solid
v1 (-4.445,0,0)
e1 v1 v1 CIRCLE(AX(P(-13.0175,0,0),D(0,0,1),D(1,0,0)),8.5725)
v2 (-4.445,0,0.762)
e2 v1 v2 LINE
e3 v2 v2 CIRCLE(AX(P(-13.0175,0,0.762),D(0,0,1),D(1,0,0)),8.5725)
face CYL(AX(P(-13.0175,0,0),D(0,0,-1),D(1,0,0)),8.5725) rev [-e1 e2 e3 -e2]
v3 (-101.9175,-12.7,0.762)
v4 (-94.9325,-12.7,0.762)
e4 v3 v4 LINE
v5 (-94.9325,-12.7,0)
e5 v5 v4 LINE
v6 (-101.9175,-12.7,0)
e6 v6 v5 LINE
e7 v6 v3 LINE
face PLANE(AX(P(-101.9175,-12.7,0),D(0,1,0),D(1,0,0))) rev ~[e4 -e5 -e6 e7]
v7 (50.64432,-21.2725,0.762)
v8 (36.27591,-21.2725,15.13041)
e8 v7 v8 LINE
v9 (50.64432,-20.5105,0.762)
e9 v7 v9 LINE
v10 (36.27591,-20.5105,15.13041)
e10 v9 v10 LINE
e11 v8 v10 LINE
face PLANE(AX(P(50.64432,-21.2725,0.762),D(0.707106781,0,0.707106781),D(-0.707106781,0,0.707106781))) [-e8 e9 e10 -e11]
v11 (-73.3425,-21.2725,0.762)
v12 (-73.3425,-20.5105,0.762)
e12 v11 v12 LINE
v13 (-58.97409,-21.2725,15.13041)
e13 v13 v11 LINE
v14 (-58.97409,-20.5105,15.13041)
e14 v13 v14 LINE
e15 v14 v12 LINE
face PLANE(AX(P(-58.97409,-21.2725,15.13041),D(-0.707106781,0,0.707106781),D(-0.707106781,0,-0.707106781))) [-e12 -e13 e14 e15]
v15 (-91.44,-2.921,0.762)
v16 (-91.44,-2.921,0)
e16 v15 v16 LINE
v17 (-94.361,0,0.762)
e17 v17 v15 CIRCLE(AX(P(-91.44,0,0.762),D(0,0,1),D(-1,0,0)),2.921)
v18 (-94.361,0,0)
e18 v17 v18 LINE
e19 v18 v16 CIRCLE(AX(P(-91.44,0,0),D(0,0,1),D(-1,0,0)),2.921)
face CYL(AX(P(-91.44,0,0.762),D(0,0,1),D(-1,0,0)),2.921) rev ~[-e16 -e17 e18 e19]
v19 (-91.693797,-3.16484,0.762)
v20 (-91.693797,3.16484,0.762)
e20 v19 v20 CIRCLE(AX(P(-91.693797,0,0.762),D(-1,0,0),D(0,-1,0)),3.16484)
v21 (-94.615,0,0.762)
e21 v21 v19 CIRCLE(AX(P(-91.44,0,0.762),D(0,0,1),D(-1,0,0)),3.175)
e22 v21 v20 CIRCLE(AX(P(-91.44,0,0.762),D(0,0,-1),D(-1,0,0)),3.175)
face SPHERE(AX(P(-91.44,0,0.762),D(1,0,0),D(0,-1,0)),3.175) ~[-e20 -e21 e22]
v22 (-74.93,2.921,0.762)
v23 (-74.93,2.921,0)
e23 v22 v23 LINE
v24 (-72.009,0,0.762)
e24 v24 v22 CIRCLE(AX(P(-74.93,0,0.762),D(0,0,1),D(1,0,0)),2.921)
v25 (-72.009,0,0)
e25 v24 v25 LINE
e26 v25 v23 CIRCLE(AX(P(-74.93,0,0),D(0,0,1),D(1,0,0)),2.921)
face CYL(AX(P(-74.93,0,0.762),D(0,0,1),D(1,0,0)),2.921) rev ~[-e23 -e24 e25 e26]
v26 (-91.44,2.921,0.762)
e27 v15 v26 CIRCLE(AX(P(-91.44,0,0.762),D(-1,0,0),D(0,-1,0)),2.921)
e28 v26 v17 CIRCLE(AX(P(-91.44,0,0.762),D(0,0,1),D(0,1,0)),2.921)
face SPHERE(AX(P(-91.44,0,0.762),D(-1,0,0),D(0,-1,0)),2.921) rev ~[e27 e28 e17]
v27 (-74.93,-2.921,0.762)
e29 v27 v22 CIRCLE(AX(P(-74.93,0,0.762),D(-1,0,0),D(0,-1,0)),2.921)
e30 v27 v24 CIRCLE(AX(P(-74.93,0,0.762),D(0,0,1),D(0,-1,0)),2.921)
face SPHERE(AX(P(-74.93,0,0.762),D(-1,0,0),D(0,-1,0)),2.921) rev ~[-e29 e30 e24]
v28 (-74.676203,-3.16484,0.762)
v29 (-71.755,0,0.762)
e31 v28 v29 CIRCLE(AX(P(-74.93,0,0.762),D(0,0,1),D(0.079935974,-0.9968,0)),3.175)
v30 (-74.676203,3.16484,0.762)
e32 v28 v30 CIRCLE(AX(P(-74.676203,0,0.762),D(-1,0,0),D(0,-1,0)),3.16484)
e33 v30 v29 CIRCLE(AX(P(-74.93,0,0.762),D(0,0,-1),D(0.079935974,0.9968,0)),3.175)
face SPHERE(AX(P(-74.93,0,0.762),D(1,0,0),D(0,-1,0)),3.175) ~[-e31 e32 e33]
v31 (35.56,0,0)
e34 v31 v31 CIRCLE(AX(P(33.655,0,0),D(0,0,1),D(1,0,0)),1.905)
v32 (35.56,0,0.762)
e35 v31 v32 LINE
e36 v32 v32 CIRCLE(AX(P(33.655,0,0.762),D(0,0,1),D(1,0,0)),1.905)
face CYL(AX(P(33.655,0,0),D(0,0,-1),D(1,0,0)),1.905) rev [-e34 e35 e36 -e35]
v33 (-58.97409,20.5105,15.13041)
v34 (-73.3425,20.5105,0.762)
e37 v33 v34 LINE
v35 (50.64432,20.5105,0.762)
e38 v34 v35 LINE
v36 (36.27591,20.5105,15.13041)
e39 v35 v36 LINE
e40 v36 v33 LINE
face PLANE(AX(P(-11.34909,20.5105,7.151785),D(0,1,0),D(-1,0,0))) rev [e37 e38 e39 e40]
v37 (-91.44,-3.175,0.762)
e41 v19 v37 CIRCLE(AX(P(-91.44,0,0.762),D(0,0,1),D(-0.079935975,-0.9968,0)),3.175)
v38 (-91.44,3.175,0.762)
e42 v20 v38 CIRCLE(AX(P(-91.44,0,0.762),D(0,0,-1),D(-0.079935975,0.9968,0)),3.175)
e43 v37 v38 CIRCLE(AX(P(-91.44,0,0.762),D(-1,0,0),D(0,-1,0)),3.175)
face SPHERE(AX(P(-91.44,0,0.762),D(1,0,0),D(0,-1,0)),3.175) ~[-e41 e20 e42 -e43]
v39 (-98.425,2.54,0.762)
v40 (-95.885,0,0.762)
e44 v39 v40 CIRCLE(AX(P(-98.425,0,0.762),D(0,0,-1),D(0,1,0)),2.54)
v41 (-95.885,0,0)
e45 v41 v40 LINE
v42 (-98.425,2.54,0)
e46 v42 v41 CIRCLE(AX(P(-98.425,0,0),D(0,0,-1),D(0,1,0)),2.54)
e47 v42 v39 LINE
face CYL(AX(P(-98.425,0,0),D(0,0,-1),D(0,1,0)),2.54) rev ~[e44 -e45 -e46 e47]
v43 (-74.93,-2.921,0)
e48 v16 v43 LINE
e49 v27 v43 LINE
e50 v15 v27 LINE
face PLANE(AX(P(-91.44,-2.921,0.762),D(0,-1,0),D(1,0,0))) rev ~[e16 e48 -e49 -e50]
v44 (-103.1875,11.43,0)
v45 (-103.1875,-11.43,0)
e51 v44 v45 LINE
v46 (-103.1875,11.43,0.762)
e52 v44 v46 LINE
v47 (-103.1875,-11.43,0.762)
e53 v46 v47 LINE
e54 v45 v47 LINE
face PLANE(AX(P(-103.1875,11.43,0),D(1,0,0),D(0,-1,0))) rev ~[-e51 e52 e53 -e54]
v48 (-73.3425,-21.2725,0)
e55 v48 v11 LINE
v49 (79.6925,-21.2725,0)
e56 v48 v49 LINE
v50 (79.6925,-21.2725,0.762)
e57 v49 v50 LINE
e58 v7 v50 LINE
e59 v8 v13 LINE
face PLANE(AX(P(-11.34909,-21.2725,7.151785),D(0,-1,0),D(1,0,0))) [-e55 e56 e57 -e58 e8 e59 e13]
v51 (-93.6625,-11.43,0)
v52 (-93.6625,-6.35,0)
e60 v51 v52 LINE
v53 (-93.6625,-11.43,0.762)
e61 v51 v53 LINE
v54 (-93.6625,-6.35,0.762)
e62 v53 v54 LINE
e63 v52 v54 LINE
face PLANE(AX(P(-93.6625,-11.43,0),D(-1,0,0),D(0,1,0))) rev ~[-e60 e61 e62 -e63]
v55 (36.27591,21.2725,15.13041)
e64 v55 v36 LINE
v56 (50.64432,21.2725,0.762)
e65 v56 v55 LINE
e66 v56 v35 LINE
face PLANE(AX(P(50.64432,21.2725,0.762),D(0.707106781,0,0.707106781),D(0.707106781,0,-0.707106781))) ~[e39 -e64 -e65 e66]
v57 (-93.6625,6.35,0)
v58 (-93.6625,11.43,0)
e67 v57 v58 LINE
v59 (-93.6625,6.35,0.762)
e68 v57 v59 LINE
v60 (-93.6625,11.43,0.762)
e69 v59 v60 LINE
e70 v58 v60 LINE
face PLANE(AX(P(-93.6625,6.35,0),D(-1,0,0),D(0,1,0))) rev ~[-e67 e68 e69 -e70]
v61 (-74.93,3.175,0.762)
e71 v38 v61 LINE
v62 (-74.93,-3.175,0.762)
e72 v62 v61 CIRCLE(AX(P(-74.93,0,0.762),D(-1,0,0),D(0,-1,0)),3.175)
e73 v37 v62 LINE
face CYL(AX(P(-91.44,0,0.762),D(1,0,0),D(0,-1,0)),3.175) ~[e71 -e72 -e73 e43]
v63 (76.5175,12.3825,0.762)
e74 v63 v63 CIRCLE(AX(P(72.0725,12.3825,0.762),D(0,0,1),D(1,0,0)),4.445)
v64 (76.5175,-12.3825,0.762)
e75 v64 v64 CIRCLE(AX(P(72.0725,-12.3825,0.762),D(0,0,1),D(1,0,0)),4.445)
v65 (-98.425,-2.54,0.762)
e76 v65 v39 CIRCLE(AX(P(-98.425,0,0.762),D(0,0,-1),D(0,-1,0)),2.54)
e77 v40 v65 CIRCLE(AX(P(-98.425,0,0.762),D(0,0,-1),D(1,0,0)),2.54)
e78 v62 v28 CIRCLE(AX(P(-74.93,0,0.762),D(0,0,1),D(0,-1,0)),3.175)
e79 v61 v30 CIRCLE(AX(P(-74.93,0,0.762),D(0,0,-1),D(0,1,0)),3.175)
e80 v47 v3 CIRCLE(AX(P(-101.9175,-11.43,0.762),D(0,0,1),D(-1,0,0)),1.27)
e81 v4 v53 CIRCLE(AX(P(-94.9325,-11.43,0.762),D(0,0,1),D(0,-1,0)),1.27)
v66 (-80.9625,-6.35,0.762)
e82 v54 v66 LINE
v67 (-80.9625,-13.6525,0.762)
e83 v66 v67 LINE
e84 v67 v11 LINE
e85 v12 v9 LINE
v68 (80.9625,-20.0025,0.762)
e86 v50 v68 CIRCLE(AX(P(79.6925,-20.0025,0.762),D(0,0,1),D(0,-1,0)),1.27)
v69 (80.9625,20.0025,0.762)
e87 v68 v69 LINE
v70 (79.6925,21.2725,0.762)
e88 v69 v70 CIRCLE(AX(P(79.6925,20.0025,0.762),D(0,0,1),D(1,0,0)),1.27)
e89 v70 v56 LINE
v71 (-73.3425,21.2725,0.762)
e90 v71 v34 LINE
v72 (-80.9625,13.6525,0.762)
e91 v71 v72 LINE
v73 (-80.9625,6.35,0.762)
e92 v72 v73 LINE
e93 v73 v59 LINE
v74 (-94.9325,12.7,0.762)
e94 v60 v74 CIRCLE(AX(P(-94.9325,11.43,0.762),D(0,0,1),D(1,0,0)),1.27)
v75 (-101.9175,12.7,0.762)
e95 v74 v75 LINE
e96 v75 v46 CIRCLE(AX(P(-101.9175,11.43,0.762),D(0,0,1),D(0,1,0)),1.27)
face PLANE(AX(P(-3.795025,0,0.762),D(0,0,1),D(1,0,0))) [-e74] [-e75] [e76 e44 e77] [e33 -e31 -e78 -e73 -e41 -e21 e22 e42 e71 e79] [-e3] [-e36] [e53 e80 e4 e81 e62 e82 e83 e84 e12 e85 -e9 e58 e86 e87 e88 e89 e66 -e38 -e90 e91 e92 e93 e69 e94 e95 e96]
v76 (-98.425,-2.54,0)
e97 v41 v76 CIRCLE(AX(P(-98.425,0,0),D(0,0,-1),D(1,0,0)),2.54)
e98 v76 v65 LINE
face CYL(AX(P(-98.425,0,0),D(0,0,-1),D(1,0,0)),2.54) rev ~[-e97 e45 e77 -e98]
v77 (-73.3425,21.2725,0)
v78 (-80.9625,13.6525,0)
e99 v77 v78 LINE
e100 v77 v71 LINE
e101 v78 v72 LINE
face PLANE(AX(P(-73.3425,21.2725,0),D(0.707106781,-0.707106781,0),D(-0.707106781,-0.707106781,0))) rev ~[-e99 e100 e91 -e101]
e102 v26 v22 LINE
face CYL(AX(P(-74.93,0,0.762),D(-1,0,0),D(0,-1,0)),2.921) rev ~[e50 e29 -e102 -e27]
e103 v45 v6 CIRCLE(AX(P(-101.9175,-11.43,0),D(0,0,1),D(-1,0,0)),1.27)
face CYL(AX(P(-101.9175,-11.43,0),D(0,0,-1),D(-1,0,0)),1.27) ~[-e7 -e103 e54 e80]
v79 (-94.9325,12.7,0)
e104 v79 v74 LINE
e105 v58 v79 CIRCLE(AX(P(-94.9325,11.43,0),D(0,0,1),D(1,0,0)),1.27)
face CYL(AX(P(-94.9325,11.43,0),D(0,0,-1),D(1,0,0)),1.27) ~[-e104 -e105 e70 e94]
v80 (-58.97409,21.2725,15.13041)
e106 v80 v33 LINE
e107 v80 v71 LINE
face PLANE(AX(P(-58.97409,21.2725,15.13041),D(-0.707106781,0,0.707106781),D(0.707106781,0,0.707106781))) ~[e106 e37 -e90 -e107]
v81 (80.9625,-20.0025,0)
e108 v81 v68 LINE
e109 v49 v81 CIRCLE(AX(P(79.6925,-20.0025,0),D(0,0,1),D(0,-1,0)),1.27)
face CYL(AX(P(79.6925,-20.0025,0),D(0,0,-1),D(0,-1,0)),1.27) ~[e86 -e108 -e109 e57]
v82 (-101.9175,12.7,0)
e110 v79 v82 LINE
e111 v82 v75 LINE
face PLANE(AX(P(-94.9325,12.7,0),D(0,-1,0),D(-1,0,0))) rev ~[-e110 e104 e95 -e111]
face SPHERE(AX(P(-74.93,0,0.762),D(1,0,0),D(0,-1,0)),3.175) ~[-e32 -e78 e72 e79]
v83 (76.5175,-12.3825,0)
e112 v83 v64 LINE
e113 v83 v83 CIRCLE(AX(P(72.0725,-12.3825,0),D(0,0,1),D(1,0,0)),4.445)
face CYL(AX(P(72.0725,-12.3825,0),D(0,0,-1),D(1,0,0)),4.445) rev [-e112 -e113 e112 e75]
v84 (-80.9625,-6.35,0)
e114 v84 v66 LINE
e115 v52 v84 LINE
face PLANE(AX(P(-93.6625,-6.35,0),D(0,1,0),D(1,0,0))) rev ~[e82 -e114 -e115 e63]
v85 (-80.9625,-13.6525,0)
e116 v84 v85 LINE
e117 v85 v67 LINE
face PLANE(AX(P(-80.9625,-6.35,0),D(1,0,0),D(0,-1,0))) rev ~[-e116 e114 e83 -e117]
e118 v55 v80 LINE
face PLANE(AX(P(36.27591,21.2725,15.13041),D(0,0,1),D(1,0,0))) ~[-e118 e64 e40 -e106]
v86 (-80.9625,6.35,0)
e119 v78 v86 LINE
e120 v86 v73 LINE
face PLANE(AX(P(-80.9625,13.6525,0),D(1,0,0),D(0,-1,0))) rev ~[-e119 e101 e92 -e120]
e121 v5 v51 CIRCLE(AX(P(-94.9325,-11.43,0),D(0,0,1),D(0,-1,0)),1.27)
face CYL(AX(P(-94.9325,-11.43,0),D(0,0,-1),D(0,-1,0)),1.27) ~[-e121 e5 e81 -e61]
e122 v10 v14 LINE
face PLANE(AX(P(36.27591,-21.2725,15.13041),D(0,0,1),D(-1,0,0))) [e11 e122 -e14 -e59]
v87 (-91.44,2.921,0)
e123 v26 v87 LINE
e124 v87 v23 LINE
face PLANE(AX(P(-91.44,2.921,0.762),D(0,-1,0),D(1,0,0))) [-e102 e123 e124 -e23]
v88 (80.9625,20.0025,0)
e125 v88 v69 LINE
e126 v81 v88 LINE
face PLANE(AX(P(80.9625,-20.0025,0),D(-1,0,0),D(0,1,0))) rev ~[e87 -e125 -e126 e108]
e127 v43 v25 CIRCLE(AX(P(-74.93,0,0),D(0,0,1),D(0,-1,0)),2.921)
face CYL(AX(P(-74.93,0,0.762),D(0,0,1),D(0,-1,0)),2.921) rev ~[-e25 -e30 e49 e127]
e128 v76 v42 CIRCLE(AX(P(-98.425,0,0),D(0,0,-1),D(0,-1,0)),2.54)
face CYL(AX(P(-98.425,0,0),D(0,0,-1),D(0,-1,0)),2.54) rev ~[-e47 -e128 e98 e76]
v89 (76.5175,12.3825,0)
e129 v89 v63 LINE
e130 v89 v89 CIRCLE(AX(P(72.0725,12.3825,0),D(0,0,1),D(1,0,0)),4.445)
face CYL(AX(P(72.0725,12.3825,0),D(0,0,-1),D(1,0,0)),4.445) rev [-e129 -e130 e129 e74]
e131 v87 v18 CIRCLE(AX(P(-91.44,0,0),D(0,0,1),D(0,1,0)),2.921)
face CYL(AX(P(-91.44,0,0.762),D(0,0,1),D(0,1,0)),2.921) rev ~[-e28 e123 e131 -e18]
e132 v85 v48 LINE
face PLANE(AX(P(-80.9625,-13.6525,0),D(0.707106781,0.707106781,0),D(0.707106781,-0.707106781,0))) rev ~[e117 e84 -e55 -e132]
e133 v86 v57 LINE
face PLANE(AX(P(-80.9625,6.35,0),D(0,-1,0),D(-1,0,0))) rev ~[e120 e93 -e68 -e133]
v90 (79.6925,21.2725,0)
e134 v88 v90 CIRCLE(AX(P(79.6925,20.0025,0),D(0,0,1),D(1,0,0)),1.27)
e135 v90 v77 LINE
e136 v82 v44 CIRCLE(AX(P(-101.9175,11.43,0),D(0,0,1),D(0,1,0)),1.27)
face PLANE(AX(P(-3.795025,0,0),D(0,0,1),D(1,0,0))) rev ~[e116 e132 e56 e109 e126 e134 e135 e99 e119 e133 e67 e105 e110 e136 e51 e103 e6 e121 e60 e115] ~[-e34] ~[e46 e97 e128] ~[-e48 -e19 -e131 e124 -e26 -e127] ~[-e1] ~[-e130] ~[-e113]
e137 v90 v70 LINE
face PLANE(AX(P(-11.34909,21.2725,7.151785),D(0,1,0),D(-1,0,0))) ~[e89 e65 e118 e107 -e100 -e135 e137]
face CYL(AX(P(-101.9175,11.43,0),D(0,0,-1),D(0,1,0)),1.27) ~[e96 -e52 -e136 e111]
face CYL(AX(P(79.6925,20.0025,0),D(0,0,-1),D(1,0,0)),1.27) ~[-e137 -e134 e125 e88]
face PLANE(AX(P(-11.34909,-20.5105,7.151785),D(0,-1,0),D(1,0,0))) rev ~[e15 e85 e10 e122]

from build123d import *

# Parameters (mm, degrees)
F0_R     = 4.445
F0_R_2   = 8.5725
F0_R_3   = 1.905
F0_W     = 17.4625
F0_H     = 12.7
F0_W_2   = 12.7
F1_DEPTH = 0.762
F3_DEPTH = 0.762
F4_W     = 16.51
F4_H     = 2.921
F5_DEPTH = 25.4
F6_ANGLE = 180


# Not quite as in the source:
# - a pattern or mirror of a feature is missing from the dataset's text; its kind, count and spacing are read off the source's solid


with BuildPart() as f1:
    # F0 (on Top) → F1 (new body)
    with BuildSketch(Plane.XY):
        with BuildLine():
            Line((79.6925, 21.2725), (-73.3425, 21.2725))
            Line((-73.3425, 21.2725), (-80.9625, 13.6525))
            Line((-80.9625, 13.6525), (-80.9625, 6.35))
            Line((-80.9625, 6.35), (-63.5, 6.35))
            Line((-63.5, 6.35), (-63.5, -6.35))
            Line((-63.5, -6.35), (-80.9625, -6.35))
            Line((-80.9625, -6.35), (-80.9625, -13.6525))
            Line((-80.9625, -13.6525), (-73.3425, -21.2725))
            Line((-73.3425, -21.2725), (79.6925, -21.2725))
            ThreePointArc((79.6925, -21.2725), (80.5905256121, -20.9005256121), (80.9625, -20.0025))
            Line((80.9625, -20.0025), (80.9625, 20.0025))
            ThreePointArc((80.9625, 20.0025), (80.5905256121, 20.9005256121), (79.6925, 21.2725))
        make_face()
        with Locations((72.0725, -12.3825)):
            Circle(F0_R, mode=Mode.SUBTRACT)
        with Locations((-13.0175, 0)):
            Circle(F0_R_2, mode=Mode.SUBTRACT)
        with Locations((33.655, 0)):
            Circle(F0_R_3, mode=Mode.SUBTRACT)
        with Locations((72.0725, 12.3825)):
            Circle(F0_R, mode=Mode.SUBTRACT)
        with Locations((-72.23125, 0)):
            Rectangle(F0_W, F0_H)
        with Locations((-87.3125, 0)):
            Rectangle(F0_W_2, F0_H)
        with BuildLine():
            Line((-93.6625, -6.35), (-93.6625, 6.35))
            Line((-93.6625, 6.35), (-98.425, 6.35))
            Line((-98.425, 6.35), (-98.425, 2.54))
            ThreePointArc((-98.425, 2.54), (-96.6289487758, 1.7960512242), (-95.885, 0))
            ThreePointArc((-95.885, 0), (-96.6289487758, -1.7960512242), (-98.425, -2.54))
            Line((-98.425, -2.54), (-98.425, -6.35))
            Line((-98.425, -6.35), (-93.6625, -6.35))
        make_face()
        with BuildLine():
            Line((-98.425, 6.35), (-93.6625, 6.35))
            Line((-93.6625, 6.35), (-93.6625, 11.43))
            ThreePointArc((-93.6625, 11.43), (-94.0344743879, 12.3280256121), (-94.9325, 12.7))
            Line((-94.9325, 12.7), (-101.9175, 12.7))
            ThreePointArc((-101.9175, 12.7), (-102.8155256121, 12.3280256121), (-103.1875, 11.43))
            Line((-103.1875, 11.43), (-103.1875, -11.43))
            ThreePointArc((-103.1875, -11.43), (-102.8155256121, -12.3280256121), (-101.9175, -12.7))
            Line((-101.9175, -12.7), (-94.9325, -12.7))
            ThreePointArc((-94.9325, -12.7), (-94.0344743879, -12.3280256121), (-93.6625, -11.43))
            Line((-93.6625, -11.43), (-93.6625, -6.35))
            Line((-93.6625, -6.35), (-98.425, -6.35))
            Line((-98.425, -6.35), (-98.425, -2.54))
            ThreePointArc((-98.425, -2.54), (-100.965, 0), (-98.425, 2.54))
            Line((-98.425, 2.54), (-98.425, 6.35))
        make_face()
    extrude(amount=F1_DEPTH)

    # F2 (on face) → F3 (join)
    with BuildSketch(Plane.XZ.offset(21.2725)):
        Polygon((-58.9740902063, 15.1304097937), (-73.3425, 0.762), (50.6443195874, 0.762), (36.2759097937, 15.1304097937), align=None)
    f3 = extrude(amount=-F3_DEPTH)

    # F3_copies: F3 across plane
    add(f3.mirror(Plane.ZX))

    # F4 (on face) → F5 (cut)
    with BuildSketch(Plane.XY.offset(0.762)):
        with BuildLine():
            Line((-91.44, 0), (-91.44, 2.921))
            ThreePointArc((-91.44, 2.921), (-93.5054589078, 2.0654589078), (-94.361, 0))
            Line((-94.361, 0), (-91.44, 0))
        make_face()
        with BuildLine():
            Line((-91.44, -2.921), (-91.44, 0))
            Line((-91.44, 0), (-94.361, 0))
            ThreePointArc((-94.361, 0), (-93.5054589078, -2.0654589078), (-91.44, -2.921))
        make_face()
        with Locations((-83.185, 1.4605)):
            Rectangle(F4_W, F4_H)
        with BuildLine():
            Line((-72.009, 0), (-74.93, 0))
            Line((-74.93, 0), (-74.93, -2.921))
            ThreePointArc((-74.93, -2.921), (-72.8645410922, -2.0654589078), (-72.009, 0))
        make_face()
        with BuildLine():
            ThreePointArc((-72.009, 0), (-72.8645410922, 2.0654589078), (-74.93, 2.921))
            Line((-74.93, 2.921), (-74.93, 0))
            Line((-74.93, 0), (-72.009, 0))
        make_face()
        with Locations((-83.185, -1.4605)):
            Rectangle(F4_W, F4_H)
    extrude(amount=-F5_DEPTH, mode=Mode.SUBTRACT)

    # F4 (on face) → F6 (revolve)
    with BuildSketch(Plane.XY.offset(0.762)):
        with BuildLine():
            Line((-71.755, 0), (-72.009, 0))
            ThreePointArc((-72.009, 0), (-72.8645410922, -2.0654589078), (-74.93, -2.921))
            ThreePointArc((-74.93, -2.921), (-74.754023638, -2.9918379952), (-74.6762032813, -3.16484))
            ThreePointArc((-74.6762032813, -3.16484), (-72.5969301787, -2.1534646988), (-71.755, 0))
        make_face()
        with BuildLine():
            ThreePointArc((-74.6762032813, -3.16484), (-74.754023638, -2.9918379952), (-74.93, -2.921))
            Line((-74.93, -2.921), (-74.93, -3.175))
            ThreePointArc((-74.93, -3.175), (-74.803, -3.1724589832), (-74.6762032813, -3.16484))
        make_face()
        with BuildLine():
            Line((-74.93, -3.175), (-74.93, -2.921))
            ThreePointArc((-74.93, -2.921), (-75.1096051224, -2.9953948776), (-75.184, -3.175))
            Line((-75.184, -3.175), (-74.93, -3.175))
        make_face()
        with BuildLine():
            Line((-74.93, -2.921), (-91.44, -2.921))
            ThreePointArc((-91.44, -2.921), (-91.2603948776, -2.9953948776), (-91.186, -3.175))
            Line((-91.186, -3.175), (-75.184, -3.175))
            ThreePointArc((-75.184, -3.175), (-75.1096051224, -2.9953948776), (-74.93, -2.921))
        make_face()
        with BuildLine():
            ThreePointArc((-91.186, -3.175), (-91.2603948776, -2.9953948776), (-91.44, -2.921))
            Line((-91.44, -2.921), (-91.44, -3.175))
            Line((-91.44, -3.175), (-91.186, -3.175))
        make_face()
        with BuildLine():
            Line((-91.44, -3.175), (-91.44, -2.921))
            ThreePointArc((-91.44, -2.921), (-91.615976362, -2.9918379952), (-91.6937967187, -3.16484))
            ThreePointArc((-91.6937967187, -3.16484), (-91.567, -3.1724589832), (-91.44, -3.175))
        make_face()
        with BuildLine():
            ThreePointArc((-91.44, -2.921), (-93.5054589078, -2.0654589078), (-94.361, 0))
            Line((-94.361, 0), (-94.615, 0))
            ThreePointArc((-94.615, 0), (-93.7730698213, -2.1534646988), (-91.6937967187, -3.16484))
            ThreePointArc((-91.6937967187, -3.16484), (-91.615976362, -2.9918379952), (-91.44, -2.921))
        make_face()
    revolve(axis=Axis((-83.185, 0, 0.762), (-1, 0, 0)), revolution_arc=F6_ANGLE)


solid = f1.part
